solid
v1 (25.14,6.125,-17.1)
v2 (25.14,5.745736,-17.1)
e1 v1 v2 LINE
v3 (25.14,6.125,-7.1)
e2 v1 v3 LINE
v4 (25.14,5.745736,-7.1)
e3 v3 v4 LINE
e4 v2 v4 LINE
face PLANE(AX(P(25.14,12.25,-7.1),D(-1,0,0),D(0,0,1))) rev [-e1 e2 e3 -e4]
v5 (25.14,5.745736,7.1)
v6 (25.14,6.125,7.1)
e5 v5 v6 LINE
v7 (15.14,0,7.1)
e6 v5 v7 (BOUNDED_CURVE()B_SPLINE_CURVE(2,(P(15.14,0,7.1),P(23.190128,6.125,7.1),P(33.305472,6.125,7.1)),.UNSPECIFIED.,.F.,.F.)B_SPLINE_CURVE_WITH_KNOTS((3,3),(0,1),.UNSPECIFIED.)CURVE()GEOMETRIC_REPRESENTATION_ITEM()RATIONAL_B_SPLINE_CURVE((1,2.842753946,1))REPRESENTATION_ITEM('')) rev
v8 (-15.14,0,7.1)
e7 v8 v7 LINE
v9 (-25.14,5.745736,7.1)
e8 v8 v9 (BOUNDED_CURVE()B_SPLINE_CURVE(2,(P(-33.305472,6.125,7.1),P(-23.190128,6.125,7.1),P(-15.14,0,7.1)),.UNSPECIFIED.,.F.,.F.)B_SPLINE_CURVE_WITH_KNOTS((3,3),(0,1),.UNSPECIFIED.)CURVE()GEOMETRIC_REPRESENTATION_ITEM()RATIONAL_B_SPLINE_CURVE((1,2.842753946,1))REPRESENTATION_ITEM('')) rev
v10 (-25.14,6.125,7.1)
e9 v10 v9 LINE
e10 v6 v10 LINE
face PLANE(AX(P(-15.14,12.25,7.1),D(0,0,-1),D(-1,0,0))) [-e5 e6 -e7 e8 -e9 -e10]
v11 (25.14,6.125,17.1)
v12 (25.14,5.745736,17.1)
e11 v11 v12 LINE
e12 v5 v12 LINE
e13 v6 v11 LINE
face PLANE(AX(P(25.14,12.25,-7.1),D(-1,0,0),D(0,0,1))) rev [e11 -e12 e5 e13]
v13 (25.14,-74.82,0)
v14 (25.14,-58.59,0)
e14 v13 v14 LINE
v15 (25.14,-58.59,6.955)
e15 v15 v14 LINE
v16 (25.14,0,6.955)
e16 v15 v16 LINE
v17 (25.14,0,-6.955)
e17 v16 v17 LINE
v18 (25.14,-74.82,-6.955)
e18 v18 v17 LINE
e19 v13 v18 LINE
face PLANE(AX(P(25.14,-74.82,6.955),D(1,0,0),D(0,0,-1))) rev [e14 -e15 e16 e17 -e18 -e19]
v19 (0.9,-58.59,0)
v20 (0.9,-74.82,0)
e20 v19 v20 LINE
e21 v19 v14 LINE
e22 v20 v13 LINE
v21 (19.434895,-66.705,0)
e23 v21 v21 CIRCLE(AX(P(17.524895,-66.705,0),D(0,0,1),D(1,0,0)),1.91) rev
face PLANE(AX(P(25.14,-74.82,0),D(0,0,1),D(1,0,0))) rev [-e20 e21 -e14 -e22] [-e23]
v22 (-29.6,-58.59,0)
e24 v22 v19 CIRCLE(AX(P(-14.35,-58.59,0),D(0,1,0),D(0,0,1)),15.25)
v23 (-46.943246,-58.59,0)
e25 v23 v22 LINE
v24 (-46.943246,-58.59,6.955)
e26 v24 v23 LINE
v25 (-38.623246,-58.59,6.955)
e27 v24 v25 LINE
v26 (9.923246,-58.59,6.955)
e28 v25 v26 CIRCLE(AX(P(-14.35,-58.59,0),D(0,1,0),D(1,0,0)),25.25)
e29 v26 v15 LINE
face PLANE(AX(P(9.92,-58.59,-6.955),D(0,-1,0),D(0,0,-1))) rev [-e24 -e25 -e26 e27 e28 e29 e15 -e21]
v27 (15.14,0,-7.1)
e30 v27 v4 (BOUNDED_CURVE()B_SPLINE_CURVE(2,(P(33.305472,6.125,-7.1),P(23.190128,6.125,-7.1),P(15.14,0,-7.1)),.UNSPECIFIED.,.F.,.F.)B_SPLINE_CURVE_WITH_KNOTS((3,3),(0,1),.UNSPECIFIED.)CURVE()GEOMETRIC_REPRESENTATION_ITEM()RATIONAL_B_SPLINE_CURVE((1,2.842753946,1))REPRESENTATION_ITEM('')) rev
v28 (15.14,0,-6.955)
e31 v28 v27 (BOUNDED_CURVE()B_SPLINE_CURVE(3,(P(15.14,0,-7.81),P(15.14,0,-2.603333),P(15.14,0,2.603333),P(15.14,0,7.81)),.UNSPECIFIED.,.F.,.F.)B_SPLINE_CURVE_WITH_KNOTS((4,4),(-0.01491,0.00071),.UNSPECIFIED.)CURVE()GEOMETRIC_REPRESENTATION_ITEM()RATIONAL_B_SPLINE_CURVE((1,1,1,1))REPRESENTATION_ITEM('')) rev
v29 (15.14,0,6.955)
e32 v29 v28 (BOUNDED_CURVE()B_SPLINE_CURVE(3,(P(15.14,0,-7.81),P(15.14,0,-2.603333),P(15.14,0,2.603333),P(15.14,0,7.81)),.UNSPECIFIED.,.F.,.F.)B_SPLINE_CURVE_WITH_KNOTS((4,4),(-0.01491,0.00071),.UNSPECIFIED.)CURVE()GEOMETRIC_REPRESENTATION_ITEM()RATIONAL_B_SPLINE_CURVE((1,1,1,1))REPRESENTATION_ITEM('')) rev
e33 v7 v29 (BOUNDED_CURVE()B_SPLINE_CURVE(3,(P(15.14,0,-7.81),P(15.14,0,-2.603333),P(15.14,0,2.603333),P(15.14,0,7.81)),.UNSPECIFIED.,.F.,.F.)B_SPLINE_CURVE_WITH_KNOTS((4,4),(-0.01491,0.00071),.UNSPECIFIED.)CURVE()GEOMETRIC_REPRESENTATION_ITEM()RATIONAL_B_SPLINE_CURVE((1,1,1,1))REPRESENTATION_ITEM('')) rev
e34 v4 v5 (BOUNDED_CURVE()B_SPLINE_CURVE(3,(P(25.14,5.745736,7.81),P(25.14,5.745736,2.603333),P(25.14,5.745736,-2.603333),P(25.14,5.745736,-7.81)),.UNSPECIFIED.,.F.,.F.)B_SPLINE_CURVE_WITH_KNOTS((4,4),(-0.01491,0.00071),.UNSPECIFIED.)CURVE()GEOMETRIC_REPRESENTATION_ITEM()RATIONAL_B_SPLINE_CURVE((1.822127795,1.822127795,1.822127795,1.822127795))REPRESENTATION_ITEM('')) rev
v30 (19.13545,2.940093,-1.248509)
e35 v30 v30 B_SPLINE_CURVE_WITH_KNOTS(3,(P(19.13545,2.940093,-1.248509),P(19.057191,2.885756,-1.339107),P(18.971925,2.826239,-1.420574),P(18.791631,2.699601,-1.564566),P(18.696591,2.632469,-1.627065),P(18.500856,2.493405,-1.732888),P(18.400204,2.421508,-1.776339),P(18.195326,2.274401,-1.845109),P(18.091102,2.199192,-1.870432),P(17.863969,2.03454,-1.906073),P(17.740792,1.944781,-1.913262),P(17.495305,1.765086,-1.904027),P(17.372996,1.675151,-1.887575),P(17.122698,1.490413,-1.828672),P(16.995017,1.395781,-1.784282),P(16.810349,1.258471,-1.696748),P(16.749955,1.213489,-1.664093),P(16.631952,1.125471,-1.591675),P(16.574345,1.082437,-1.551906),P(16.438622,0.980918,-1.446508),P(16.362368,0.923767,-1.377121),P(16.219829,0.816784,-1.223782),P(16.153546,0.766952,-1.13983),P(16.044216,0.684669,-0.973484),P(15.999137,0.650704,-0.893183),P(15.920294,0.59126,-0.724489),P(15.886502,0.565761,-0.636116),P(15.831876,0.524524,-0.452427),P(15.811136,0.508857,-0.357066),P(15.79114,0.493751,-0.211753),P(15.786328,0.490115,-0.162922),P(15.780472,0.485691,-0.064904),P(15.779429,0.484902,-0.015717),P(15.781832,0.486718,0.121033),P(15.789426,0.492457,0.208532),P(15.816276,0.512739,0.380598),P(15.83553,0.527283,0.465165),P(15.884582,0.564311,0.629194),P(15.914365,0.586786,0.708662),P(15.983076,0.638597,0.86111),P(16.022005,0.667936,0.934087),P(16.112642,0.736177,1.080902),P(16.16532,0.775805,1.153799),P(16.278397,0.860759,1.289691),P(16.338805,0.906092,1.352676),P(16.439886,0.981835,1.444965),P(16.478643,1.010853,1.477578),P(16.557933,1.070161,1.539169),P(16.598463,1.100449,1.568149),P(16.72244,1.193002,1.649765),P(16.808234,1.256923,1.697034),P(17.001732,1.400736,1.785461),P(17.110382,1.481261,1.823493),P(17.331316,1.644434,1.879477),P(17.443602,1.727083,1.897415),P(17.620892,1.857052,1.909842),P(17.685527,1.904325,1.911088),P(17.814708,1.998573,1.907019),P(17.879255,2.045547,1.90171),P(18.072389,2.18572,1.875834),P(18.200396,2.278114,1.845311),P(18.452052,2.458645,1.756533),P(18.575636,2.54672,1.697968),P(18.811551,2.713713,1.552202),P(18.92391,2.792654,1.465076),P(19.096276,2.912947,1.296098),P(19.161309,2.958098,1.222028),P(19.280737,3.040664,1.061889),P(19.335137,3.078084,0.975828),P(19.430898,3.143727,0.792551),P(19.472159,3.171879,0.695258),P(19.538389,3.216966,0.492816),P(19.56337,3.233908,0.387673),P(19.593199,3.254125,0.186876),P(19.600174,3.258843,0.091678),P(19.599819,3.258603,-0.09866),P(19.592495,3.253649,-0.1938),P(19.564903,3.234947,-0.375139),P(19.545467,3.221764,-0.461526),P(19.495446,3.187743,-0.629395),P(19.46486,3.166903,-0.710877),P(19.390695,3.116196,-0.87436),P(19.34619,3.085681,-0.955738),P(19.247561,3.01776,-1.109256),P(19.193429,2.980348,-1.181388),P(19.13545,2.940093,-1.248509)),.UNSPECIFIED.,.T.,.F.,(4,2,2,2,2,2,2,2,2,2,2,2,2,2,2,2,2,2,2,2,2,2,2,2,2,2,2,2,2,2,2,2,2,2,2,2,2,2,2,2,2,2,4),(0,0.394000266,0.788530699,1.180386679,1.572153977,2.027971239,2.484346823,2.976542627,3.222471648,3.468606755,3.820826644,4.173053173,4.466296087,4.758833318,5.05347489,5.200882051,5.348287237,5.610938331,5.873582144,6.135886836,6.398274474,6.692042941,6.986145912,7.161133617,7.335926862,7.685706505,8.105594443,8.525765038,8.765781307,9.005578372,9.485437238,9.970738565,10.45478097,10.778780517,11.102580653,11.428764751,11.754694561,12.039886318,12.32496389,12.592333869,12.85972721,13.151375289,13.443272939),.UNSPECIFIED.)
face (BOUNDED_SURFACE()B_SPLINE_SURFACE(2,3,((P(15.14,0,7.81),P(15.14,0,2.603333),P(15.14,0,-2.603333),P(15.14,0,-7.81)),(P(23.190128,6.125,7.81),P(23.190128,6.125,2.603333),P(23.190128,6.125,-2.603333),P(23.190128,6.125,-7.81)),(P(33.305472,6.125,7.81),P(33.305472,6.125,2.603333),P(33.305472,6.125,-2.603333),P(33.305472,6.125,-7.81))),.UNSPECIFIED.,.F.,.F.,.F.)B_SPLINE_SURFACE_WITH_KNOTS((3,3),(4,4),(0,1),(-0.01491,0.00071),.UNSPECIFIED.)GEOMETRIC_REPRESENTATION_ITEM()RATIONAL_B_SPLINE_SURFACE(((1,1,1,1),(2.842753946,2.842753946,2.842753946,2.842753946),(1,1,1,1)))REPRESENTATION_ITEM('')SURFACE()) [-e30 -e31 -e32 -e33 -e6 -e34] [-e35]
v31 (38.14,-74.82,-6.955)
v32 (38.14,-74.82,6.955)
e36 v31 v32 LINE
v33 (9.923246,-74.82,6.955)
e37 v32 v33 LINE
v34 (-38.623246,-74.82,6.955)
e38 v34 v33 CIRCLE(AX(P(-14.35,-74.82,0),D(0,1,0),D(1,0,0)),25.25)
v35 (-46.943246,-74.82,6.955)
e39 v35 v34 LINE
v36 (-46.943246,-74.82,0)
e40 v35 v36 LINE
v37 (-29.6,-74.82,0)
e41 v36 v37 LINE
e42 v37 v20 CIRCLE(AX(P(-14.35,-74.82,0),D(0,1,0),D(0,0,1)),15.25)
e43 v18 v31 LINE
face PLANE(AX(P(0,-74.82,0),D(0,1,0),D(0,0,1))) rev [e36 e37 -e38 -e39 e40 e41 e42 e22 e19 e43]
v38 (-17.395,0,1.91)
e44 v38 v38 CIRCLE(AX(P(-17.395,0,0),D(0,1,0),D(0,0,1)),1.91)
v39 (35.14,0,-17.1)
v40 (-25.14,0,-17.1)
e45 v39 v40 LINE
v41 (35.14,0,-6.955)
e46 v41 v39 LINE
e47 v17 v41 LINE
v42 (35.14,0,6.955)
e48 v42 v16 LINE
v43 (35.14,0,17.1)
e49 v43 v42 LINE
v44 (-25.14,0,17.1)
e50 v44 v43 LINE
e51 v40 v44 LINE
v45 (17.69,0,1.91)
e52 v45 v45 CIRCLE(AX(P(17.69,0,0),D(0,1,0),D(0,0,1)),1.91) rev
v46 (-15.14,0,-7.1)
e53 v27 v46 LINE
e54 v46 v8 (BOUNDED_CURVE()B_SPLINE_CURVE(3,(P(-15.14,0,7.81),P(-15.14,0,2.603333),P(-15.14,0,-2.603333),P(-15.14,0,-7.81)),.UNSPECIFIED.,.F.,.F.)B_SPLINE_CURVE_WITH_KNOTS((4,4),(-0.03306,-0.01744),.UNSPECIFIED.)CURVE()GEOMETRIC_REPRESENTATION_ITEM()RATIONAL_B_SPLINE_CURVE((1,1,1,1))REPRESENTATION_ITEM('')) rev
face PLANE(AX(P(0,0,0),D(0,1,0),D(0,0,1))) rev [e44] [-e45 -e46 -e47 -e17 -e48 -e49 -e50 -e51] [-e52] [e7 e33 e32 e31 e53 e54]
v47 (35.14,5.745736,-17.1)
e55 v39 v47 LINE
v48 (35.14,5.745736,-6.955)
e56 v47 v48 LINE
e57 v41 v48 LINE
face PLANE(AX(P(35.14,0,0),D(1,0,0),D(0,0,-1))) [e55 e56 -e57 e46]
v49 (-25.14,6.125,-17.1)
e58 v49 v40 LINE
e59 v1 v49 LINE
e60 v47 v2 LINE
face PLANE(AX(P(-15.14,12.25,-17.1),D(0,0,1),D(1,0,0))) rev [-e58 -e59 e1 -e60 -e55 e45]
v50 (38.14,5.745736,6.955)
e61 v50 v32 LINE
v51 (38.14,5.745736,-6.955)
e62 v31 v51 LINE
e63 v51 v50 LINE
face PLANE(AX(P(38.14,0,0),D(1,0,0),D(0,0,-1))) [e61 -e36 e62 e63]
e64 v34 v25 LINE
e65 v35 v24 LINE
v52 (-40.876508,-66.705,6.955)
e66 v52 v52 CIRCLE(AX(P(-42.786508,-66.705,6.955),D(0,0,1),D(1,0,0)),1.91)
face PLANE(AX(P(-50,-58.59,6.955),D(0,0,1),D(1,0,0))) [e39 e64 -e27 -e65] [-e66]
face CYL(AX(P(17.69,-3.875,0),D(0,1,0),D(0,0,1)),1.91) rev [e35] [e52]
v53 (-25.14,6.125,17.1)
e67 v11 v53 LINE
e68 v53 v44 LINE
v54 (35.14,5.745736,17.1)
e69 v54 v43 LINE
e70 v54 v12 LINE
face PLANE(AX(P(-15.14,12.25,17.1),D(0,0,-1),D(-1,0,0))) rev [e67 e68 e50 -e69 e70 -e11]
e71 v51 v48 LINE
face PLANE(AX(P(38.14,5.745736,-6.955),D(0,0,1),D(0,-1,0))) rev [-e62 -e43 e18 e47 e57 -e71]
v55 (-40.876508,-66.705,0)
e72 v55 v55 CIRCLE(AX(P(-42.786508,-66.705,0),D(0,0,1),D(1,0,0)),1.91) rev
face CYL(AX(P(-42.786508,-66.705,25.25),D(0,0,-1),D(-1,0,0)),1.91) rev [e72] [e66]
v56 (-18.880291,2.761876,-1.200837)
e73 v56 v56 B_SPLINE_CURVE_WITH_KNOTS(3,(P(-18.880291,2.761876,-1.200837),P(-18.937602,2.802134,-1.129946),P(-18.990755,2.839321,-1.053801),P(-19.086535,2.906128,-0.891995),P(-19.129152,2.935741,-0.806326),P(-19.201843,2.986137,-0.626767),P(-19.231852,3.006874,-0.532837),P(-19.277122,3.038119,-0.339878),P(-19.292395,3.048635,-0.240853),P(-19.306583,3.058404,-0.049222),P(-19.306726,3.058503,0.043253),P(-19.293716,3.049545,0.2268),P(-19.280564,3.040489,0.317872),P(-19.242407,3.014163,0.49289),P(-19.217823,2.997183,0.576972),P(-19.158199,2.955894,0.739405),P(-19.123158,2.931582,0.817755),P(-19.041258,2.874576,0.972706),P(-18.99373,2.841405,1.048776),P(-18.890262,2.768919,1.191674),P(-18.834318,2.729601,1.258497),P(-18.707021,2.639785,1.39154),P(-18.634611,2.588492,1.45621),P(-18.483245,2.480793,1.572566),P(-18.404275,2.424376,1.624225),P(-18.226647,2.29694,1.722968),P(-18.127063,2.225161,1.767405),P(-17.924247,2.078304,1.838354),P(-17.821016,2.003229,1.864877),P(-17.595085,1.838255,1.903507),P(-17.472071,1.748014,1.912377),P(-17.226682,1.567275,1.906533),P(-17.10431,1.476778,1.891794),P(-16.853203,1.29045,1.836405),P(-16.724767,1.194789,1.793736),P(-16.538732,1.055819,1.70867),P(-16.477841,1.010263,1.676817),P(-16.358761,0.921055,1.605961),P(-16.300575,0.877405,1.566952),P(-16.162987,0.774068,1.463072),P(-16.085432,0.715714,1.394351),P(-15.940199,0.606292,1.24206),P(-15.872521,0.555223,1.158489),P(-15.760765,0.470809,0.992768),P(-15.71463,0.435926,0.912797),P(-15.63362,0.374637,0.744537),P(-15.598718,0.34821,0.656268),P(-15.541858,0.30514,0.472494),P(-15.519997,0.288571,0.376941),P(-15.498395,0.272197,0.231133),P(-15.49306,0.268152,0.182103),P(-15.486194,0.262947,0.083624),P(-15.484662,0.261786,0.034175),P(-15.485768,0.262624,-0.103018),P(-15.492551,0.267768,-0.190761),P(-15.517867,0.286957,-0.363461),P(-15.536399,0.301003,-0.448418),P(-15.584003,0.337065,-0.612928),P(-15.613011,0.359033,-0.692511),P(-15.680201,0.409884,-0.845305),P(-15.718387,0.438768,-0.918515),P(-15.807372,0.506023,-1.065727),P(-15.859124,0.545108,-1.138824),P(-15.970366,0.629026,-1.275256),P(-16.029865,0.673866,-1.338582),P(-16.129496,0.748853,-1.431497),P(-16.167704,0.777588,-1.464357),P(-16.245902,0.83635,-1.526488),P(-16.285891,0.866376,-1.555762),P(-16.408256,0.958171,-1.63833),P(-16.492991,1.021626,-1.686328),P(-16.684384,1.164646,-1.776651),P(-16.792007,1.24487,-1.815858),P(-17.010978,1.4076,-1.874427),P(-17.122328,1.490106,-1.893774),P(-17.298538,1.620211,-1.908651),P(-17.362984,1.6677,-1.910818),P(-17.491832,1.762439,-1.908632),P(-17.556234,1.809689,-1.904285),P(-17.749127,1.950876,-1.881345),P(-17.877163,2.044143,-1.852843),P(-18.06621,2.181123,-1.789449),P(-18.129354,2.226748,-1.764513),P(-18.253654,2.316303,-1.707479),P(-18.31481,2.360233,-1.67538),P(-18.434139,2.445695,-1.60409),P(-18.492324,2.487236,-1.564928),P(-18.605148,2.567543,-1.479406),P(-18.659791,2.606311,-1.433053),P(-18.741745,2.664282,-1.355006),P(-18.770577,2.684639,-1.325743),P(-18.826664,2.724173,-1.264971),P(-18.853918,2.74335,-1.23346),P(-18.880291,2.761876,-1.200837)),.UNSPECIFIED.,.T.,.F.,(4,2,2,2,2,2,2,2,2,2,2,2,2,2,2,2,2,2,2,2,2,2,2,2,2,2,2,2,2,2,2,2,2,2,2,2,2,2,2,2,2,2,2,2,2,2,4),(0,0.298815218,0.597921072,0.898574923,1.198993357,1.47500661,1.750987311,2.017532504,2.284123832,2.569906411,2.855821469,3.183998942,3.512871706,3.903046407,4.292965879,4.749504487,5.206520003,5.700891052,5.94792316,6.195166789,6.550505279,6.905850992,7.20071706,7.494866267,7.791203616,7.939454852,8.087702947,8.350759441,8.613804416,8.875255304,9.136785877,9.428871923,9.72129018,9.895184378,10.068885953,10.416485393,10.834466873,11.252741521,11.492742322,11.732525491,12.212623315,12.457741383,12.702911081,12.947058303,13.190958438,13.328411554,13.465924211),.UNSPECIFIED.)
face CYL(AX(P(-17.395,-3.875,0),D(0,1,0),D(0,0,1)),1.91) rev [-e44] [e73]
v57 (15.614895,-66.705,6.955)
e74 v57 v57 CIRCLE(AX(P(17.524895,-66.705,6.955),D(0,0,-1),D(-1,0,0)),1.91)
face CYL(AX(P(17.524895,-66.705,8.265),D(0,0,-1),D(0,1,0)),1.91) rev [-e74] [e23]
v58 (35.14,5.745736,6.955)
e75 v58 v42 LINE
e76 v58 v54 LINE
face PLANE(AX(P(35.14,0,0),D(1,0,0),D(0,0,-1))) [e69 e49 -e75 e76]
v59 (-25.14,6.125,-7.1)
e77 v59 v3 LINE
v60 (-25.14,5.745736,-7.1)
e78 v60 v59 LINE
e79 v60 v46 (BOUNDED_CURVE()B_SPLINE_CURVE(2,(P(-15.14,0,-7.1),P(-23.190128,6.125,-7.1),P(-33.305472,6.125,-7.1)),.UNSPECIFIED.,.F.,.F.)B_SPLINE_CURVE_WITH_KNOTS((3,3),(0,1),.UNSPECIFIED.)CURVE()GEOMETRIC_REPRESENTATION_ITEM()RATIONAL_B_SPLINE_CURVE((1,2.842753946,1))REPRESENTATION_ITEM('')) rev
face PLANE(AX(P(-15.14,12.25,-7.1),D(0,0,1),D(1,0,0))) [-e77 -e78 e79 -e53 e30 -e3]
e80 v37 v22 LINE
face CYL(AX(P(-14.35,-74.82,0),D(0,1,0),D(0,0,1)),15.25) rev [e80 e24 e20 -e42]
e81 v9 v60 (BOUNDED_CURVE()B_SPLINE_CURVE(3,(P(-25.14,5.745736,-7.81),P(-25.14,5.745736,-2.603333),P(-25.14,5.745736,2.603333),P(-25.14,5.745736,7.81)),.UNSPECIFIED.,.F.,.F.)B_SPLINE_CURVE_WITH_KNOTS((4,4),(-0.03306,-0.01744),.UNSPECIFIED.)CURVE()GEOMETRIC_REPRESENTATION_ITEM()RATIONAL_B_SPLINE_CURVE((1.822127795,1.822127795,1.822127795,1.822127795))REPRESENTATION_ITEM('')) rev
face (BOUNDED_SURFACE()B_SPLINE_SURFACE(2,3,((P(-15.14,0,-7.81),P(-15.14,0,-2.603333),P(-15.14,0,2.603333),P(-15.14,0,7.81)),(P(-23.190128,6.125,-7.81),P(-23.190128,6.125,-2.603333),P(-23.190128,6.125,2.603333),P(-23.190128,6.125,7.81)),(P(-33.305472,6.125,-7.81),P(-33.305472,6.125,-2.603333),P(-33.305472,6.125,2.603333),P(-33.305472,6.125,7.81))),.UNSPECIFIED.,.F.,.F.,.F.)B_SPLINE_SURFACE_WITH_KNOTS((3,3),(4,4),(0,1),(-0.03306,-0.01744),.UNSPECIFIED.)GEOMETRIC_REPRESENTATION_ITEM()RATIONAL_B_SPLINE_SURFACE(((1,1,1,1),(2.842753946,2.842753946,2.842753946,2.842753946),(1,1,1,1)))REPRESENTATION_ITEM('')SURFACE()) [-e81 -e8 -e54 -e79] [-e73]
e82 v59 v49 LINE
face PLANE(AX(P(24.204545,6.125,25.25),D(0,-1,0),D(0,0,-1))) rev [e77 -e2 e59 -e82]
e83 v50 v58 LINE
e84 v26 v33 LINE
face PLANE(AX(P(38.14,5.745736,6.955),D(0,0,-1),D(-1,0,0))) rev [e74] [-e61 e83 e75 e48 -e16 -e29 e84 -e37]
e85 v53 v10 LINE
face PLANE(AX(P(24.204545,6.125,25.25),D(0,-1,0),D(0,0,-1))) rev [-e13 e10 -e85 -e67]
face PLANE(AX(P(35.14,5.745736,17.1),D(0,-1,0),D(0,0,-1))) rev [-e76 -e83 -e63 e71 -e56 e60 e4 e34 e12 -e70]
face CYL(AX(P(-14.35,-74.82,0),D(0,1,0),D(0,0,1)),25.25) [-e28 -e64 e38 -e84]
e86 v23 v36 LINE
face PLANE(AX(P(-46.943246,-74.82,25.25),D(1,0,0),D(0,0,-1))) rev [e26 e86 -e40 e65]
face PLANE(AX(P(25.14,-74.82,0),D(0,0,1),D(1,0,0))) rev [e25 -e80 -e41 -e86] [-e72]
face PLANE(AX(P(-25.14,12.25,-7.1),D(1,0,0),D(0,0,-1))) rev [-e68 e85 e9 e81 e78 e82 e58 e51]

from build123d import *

# Parameters (mm, degrees)
SKETCH_1_W                = 50.28
SKETCH_1_H                = 34.2
SKETCH_1_W_2              = 30.28
SKETCH_1_H_2              = 14.2
EXTRUDE_1_DEPTH           = 12.25
SKETCH_4_W                = 13
SKETCH_4_H                = 13.91
EXTRUDE_1_2_DEPTH         = 74.82
SKETCH_5_W                = 13.91
SKETCH_5_H                = 16.23
EXTRUDE_2_DEPTH           = 16
SKETCH_7_R                = 25.25
SKETCH_7_R_2              = 15.25
EXTRUDE_2_2_DEPTH         = 16.23
SKETCH_15_R               = 1.91
CUT_EXTRUDE_6_DEPTH       = 97.964478439
SKETCH_18_W               = 49.344544624
SKETCH_18_H               = 6.125
CUT_EXTRUDE_8_DEPTH       = 101.789238284
SKETCH_19_W               = 34.2
SKETCH_19_H               = 6.125
CUT_EXTRUDE_9_DEPTH       = 10
SKETCH_21_R               = 1.91
CUT_EXTRUDE_10_DEPTH      = 10
SKETCH_20_R               = 1.91
CUT_EXTRUDE_11_DEPTH      = 10
FILLET_START              = -7.1
FILLET_1_DEPTH            = 14.2
FILLET_2_DEPTH            = 14.2
SKETCH_29_W               = 13.91
SKETCH_29_H               = 74.82
EXTRUDE_5_DEPTH           = 10
SKETCH_30_W               = 10
SKETCH_30_H               = 58.59
CUT_EXTRUDE_13_DEPTH      = 97.964478439
SKETCH_32_W               = 34.2
SKETCH_32_H               = 5.745736365
EXTRUDE_6_DEPTH           = 10
CUT_EXTRUDE_16_DEPTH      = 50
CUT_EXTRUDE_16_DEPTH_BACK = 50
SKETCH_38_W               = 116.985630298
SKETCH_38_H               = 80.538350638
SKETCH_41_W               = 13.91
SKETCH_41_H               = 5.745736365
EXTRUDE_7_DEPTH           = 3
SKETCH_42_W               = 13
SKETCH_42_H               = 13.91
EXTRUDE_8_DEPTH           = 74.82
SKETCH_43_W               = 13.91
SKETCH_43_H               = 16.23
EXTRUDE_9_DEPTH           = 15.22
SKETCH_44_R               = 1.91
CUT_EXTRUDE_17_DEPTH      = 15.22
SKETCH_46_R               = 25.25
SKETCH_46_R_2             = 15.25
EXTRUDE_6_2_DEPTH         = 16.23
EXTRUDE_10_DEPTH          = 7.22
EXTRUDE_10_DEPTH_BACK     = 10
SKETCH_47_W               = 13.91
SKETCH_47_H               = 16.23
SKETCH_50_W               = 3.056753925
SKETCH_50_H               = 16.23
CUT_EXTRUDE_18_DEPTH      = 96.578211037
SKETCH_51_R               = 1.91
CUT_EXTRUDE_19_DEPTH      = 95.015226304
SKETCH_52_W               = 92.841945613
SKETCH_52_H               = 30
CUT_EXTRUDE_20_DEPTH      = 84.840694713


with BuildPart() as part:
    # 草圖1 → Extrude 1 (new body)
    with BuildSketch(Plane(origin=(0, 0, 0), x_dir=(1, 0, 0), z_dir=(0, 1, 0))):
        Rectangle(SKETCH_1_W, SKETCH_1_H)
        Rectangle(SKETCH_1_W_2, SKETCH_1_H_2, mode=Mode.SUBTRACT)
    extrude(amount=EXTRUDE_1_DEPTH)

    # 草圖4 → Extrude 1 2 (add)
    with BuildSketch(Plane.XZ):
        with Locations((18.64, 0)):
            Rectangle(SKETCH_4_W, SKETCH_4_H)
    extrude(amount=EXTRUDE_1_2_DEPTH)

    # 草圖5 → Extrude 2 (add)
    with BuildSketch(Plane.ZY.offset(-12.14)):
        with Locations((0, -66.705)):
            Rectangle(SKETCH_5_W, SKETCH_5_H)
    extrude(amount=EXTRUDE_2_DEPTH)

    # 草圖7 → Extrude 2 2 (add)
    with BuildSketch(Plane(origin=(3.626674765, -74.82, 0), x_dir=(1, 0, 0), z_dir=(0, -1, 0))):
        with Locations((-30.978154344, 0)):
            Circle(SKETCH_7_R)
        with Locations((-30.978154344, 0)):
            Circle(SKETCH_7_R_2, mode=Mode.SUBTRACT)
    extrude(amount=-EXTRUDE_2_2_DEPTH)

    # 草圖15 → 除料-伸長6 (cut, through all)
    with BuildSketch(Plane(origin=(0, 0, -6.955), x_dir=(-1, 0, 0), z_dir=(0, 0, -1))):
        with Locations((-4.530883248, -66.705)):
            Circle(SKETCH_15_R)
    extrude(amount=-CUT_EXTRUDE_6_DEPTH, mode=Mode.SUBTRACT)

    # 草圖18 → 除料-伸長8 (cut, through all)
    with BuildSketch(Plane(origin=(0, 0, -17.1), x_dir=(-1, 0, 0), z_dir=(0, 0, -1))):
        with Locations((0.467727688, 9.1875)):
            Rectangle(SKETCH_18_W, SKETCH_18_H)
    extrude(amount=-CUT_EXTRUDE_8_DEPTH, mode=Mode.SUBTRACT)

    # 草圖19 → 除料-伸長9 (cut)
    with BuildSketch(Plane.ZY.offset(-24.204544624)):
        with Locations((0, 9.1875)):
            Rectangle(SKETCH_19_W, SKETCH_19_H)
    extrude(amount=-CUT_EXTRUDE_9_DEPTH, mode=Mode.SUBTRACT)

    # 草圖21 → 除料-伸長10 (cut)
    with BuildSketch(Plane(origin=(0, 6.125, 0), x_dir=(1, 0, 0), z_dir=(0, 1, 0))):
        with Locations(Location((17.69, 0, 0), (0, 0, 270))):
            Circle(SKETCH_21_R)
    extrude(amount=-CUT_EXTRUDE_10_DEPTH, mode=Mode.SUBTRACT)

    # 草圖20 → 除料-伸長11 (cut)
    with BuildSketch(Plane(origin=(0, 6.125, 0), x_dir=(1, 0, 0), z_dir=(0, 1, 0))):
        with Locations(Location((-17.395, 0, 0), (0, 0, 270))):
            Circle(SKETCH_20_R)
    extrude(amount=-CUT_EXTRUDE_11_DEPTH, mode=Mode.SUBTRACT)

    # 圓角1: read off the stored shape, not the designer's step
    # 圓角1 outline → 圓角1 (cut)
    with BuildSketch(Plane.XY.offset(FILLET_START)):
        with BuildLine():
            add(Edge.make_bspline(
                [(-15.14, 0), (-21.974170252, 5.199829476), (-25.14, 5.745736365)],
                knots=[0, 0, 0, 0.664102345, 0.664102345, 0.664102345], degree=2, weights=[1, 2.223777218, 1.822127795]))
            Line((-15.14, 0), (-15.14, 6.125))
            Line((-15.14, 6.125), (-25.14, 6.125))
            Line((-25.14, 6.125), (-25.14, 5.745736365))
        make_face()
    extrude(amount=FILLET_1_DEPTH, mode=Mode.SUBTRACT)

    # 圓角2: read off the stored shape, not the designer's step
    # 圓角2 outline → 圓角2 (cut)
    with BuildSketch(Plane.XY.offset(FILLET_START)):
        with BuildLine():
            Line((15.14, 6.125), (15.14, 0))
            add(Edge.make_bspline(
                [(15.14, 0), (21.974170252, 5.199829476), (25.14, 5.745736365)],
                knots=[0, 0, 0, 0.664102345, 0.664102345, 0.664102345], degree=2, weights=[1, 2.223777218, 1.822127795]))
            Line((25.14, 5.745736365), (25.14, 6.125))
            Line((25.14, 6.125), (15.14, 6.125))
        make_face()
    extrude(amount=FILLET_2_DEPTH, mode=Mode.SUBTRACT)

    # 草圖29 → 填料-伸長5 (add)
    with BuildSketch(Plane(origin=(25.14, 0, 0), x_dir=(0, 0, -1), z_dir=(1, 0, 0))):
        with Locations((0, -37.41)):
            Rectangle(SKETCH_29_W, SKETCH_29_H)
    extrude(amount=EXTRUDE_5_DEPTH)

    # 草圖30 → 除料-伸長13 (cut, through all)
    with BuildSketch(Plane.XY.offset(6.955)):
        with Locations((17.14, -29.295)):
            Rectangle(SKETCH_30_W, SKETCH_30_H)
    extrude(amount=-CUT_EXTRUDE_13_DEPTH, mode=Mode.SUBTRACT)

    # 草圖32 → Extrude 6 (add)
    with BuildSketch(Plane(origin=(25.14, 0, 0), x_dir=(0, 0, -1), z_dir=(1, 0, 0))):
        with Locations((0, 2.872868182)):
            Rectangle(SKETCH_32_W, SKETCH_32_H)
    extrude(amount=EXTRUDE_6_DEPTH)

    # 草圖38 → 除料-伸長16 (cut, two sides: drawn at the far end of the back side and taken through both)
    with BuildSketch(Plane(origin=(0, 0, -6.955), x_dir=(-1, 0, 0), z_dir=(0, 0, -1)).offset(-CUT_EXTRUDE_16_DEPTH_BACK)):
        with Locations((7.268869252, -40.269175319)):
            Rectangle(SKETCH_38_W, SKETCH_38_H)
    extrude(amount=CUT_EXTRUDE_16_DEPTH + CUT_EXTRUDE_16_DEPTH_BACK, mode=Mode.SUBTRACT)

    # 草圖41 → 填料-伸長7 (add)
    with BuildSketch(Plane(origin=(35.14, 0, 0), x_dir=(0, 0, -1), z_dir=(1, 0, 0))):
        with Locations((0, 2.872868182)):
            Rectangle(SKETCH_41_W, SKETCH_41_H)
    extrude(amount=EXTRUDE_7_DEPTH)

    # 草圖42 → 填料-伸長8 (add)
    with BuildSketch(Plane(origin=(0, 0, 0), x_dir=(-1, 0, 0), z_dir=(0, -1, 0))):
        with Locations((-31.64, 0)):
            Rectangle(SKETCH_42_W, SKETCH_42_H)
    extrude(amount=EXTRUDE_8_DEPTH)

    # 草圖43 → 填料-伸長9 (add)
    with BuildSketch(Plane.ZY.offset(-25.14)):
        with Locations((0, -66.705)):
            Rectangle(SKETCH_43_W, SKETCH_43_H)
    extrude(amount=EXTRUDE_9_DEPTH)

    # 草圖44 → 除料-伸長17 (cut)
    with BuildSketch(Plane(origin=(0, 0, -6.955), x_dir=(-1, 0, 0), z_dir=(0, 0, -1))):
        with Locations(Location((-17.524895264, -66.705, 0), (0, 0, 90))):
            Circle(SKETCH_44_R)
    extrude(amount=-CUT_EXTRUDE_17_DEPTH, mode=Mode.SUBTRACT)

    # 草圖46 → Extrude 6 2 (add)
    with BuildSketch(Plane(origin=(0, -58.59, 0), x_dir=(1, 0, 0), z_dir=(0, 1, 0))):
        with Locations((-14.35, 0)):
            Circle(SKETCH_46_R)
        with Locations((-14.35, 0)):
            Circle(SKETCH_46_R_2, mode=Mode.SUBTRACT)
    extrude(amount=-EXTRUDE_6_2_DEPTH)

    # 草圖47 → 填料-伸長10 (add, two sides: drawn at the far end of the back side and taken through both)
    with BuildSketch(Plane(origin=(-40, 0, 0), x_dir=(0, 0, -1), z_dir=(1, 0, 0)).offset(-EXTRUDE_10_DEPTH_BACK)):
        with Locations((0, -66.705)):
            Rectangle(SKETCH_47_W, SKETCH_47_H)
    extrude(amount=EXTRUDE_10_DEPTH + EXTRUDE_10_DEPTH_BACK)

    # 草圖50 → 除料-伸長18 (cut, through all)
    with BuildSketch(Plane(origin=(0, 0, -6.955), x_dir=(-1, 0, 0), z_dir=(0, 0, -1))):
        with Locations((48.471623038, -66.705)):
            Rectangle(SKETCH_50_W, SKETCH_50_H)
    extrude(amount=-CUT_EXTRUDE_18_DEPTH, mode=Mode.SUBTRACT)

    # 草圖51 → 除料-伸長19 (cut, through all)
    with BuildSketch(Plane(origin=(0, 0, -6.955), x_dir=(-1, 0, 0), z_dir=(0, 0, -1))):
        with Locations((42.786508152, -66.705)):
            Circle(SKETCH_51_R)
    extrude(amount=-CUT_EXTRUDE_19_DEPTH, mode=Mode.SUBTRACT)

    # 草圖52 → 除料-伸長20 (cut, through all)
    with BuildSketch(Plane(origin=(0, -58.59, 0), x_dir=(1, 0, 0), z_dir=(0, 1, 0))):
        with Locations((-21.280972807, 15)):
            Rectangle(SKETCH_52_W, SKETCH_52_H)
    extrude(amount=-CUT_EXTRUDE_20_DEPTH, mode=Mode.SUBTRACT)


solid = part.part
